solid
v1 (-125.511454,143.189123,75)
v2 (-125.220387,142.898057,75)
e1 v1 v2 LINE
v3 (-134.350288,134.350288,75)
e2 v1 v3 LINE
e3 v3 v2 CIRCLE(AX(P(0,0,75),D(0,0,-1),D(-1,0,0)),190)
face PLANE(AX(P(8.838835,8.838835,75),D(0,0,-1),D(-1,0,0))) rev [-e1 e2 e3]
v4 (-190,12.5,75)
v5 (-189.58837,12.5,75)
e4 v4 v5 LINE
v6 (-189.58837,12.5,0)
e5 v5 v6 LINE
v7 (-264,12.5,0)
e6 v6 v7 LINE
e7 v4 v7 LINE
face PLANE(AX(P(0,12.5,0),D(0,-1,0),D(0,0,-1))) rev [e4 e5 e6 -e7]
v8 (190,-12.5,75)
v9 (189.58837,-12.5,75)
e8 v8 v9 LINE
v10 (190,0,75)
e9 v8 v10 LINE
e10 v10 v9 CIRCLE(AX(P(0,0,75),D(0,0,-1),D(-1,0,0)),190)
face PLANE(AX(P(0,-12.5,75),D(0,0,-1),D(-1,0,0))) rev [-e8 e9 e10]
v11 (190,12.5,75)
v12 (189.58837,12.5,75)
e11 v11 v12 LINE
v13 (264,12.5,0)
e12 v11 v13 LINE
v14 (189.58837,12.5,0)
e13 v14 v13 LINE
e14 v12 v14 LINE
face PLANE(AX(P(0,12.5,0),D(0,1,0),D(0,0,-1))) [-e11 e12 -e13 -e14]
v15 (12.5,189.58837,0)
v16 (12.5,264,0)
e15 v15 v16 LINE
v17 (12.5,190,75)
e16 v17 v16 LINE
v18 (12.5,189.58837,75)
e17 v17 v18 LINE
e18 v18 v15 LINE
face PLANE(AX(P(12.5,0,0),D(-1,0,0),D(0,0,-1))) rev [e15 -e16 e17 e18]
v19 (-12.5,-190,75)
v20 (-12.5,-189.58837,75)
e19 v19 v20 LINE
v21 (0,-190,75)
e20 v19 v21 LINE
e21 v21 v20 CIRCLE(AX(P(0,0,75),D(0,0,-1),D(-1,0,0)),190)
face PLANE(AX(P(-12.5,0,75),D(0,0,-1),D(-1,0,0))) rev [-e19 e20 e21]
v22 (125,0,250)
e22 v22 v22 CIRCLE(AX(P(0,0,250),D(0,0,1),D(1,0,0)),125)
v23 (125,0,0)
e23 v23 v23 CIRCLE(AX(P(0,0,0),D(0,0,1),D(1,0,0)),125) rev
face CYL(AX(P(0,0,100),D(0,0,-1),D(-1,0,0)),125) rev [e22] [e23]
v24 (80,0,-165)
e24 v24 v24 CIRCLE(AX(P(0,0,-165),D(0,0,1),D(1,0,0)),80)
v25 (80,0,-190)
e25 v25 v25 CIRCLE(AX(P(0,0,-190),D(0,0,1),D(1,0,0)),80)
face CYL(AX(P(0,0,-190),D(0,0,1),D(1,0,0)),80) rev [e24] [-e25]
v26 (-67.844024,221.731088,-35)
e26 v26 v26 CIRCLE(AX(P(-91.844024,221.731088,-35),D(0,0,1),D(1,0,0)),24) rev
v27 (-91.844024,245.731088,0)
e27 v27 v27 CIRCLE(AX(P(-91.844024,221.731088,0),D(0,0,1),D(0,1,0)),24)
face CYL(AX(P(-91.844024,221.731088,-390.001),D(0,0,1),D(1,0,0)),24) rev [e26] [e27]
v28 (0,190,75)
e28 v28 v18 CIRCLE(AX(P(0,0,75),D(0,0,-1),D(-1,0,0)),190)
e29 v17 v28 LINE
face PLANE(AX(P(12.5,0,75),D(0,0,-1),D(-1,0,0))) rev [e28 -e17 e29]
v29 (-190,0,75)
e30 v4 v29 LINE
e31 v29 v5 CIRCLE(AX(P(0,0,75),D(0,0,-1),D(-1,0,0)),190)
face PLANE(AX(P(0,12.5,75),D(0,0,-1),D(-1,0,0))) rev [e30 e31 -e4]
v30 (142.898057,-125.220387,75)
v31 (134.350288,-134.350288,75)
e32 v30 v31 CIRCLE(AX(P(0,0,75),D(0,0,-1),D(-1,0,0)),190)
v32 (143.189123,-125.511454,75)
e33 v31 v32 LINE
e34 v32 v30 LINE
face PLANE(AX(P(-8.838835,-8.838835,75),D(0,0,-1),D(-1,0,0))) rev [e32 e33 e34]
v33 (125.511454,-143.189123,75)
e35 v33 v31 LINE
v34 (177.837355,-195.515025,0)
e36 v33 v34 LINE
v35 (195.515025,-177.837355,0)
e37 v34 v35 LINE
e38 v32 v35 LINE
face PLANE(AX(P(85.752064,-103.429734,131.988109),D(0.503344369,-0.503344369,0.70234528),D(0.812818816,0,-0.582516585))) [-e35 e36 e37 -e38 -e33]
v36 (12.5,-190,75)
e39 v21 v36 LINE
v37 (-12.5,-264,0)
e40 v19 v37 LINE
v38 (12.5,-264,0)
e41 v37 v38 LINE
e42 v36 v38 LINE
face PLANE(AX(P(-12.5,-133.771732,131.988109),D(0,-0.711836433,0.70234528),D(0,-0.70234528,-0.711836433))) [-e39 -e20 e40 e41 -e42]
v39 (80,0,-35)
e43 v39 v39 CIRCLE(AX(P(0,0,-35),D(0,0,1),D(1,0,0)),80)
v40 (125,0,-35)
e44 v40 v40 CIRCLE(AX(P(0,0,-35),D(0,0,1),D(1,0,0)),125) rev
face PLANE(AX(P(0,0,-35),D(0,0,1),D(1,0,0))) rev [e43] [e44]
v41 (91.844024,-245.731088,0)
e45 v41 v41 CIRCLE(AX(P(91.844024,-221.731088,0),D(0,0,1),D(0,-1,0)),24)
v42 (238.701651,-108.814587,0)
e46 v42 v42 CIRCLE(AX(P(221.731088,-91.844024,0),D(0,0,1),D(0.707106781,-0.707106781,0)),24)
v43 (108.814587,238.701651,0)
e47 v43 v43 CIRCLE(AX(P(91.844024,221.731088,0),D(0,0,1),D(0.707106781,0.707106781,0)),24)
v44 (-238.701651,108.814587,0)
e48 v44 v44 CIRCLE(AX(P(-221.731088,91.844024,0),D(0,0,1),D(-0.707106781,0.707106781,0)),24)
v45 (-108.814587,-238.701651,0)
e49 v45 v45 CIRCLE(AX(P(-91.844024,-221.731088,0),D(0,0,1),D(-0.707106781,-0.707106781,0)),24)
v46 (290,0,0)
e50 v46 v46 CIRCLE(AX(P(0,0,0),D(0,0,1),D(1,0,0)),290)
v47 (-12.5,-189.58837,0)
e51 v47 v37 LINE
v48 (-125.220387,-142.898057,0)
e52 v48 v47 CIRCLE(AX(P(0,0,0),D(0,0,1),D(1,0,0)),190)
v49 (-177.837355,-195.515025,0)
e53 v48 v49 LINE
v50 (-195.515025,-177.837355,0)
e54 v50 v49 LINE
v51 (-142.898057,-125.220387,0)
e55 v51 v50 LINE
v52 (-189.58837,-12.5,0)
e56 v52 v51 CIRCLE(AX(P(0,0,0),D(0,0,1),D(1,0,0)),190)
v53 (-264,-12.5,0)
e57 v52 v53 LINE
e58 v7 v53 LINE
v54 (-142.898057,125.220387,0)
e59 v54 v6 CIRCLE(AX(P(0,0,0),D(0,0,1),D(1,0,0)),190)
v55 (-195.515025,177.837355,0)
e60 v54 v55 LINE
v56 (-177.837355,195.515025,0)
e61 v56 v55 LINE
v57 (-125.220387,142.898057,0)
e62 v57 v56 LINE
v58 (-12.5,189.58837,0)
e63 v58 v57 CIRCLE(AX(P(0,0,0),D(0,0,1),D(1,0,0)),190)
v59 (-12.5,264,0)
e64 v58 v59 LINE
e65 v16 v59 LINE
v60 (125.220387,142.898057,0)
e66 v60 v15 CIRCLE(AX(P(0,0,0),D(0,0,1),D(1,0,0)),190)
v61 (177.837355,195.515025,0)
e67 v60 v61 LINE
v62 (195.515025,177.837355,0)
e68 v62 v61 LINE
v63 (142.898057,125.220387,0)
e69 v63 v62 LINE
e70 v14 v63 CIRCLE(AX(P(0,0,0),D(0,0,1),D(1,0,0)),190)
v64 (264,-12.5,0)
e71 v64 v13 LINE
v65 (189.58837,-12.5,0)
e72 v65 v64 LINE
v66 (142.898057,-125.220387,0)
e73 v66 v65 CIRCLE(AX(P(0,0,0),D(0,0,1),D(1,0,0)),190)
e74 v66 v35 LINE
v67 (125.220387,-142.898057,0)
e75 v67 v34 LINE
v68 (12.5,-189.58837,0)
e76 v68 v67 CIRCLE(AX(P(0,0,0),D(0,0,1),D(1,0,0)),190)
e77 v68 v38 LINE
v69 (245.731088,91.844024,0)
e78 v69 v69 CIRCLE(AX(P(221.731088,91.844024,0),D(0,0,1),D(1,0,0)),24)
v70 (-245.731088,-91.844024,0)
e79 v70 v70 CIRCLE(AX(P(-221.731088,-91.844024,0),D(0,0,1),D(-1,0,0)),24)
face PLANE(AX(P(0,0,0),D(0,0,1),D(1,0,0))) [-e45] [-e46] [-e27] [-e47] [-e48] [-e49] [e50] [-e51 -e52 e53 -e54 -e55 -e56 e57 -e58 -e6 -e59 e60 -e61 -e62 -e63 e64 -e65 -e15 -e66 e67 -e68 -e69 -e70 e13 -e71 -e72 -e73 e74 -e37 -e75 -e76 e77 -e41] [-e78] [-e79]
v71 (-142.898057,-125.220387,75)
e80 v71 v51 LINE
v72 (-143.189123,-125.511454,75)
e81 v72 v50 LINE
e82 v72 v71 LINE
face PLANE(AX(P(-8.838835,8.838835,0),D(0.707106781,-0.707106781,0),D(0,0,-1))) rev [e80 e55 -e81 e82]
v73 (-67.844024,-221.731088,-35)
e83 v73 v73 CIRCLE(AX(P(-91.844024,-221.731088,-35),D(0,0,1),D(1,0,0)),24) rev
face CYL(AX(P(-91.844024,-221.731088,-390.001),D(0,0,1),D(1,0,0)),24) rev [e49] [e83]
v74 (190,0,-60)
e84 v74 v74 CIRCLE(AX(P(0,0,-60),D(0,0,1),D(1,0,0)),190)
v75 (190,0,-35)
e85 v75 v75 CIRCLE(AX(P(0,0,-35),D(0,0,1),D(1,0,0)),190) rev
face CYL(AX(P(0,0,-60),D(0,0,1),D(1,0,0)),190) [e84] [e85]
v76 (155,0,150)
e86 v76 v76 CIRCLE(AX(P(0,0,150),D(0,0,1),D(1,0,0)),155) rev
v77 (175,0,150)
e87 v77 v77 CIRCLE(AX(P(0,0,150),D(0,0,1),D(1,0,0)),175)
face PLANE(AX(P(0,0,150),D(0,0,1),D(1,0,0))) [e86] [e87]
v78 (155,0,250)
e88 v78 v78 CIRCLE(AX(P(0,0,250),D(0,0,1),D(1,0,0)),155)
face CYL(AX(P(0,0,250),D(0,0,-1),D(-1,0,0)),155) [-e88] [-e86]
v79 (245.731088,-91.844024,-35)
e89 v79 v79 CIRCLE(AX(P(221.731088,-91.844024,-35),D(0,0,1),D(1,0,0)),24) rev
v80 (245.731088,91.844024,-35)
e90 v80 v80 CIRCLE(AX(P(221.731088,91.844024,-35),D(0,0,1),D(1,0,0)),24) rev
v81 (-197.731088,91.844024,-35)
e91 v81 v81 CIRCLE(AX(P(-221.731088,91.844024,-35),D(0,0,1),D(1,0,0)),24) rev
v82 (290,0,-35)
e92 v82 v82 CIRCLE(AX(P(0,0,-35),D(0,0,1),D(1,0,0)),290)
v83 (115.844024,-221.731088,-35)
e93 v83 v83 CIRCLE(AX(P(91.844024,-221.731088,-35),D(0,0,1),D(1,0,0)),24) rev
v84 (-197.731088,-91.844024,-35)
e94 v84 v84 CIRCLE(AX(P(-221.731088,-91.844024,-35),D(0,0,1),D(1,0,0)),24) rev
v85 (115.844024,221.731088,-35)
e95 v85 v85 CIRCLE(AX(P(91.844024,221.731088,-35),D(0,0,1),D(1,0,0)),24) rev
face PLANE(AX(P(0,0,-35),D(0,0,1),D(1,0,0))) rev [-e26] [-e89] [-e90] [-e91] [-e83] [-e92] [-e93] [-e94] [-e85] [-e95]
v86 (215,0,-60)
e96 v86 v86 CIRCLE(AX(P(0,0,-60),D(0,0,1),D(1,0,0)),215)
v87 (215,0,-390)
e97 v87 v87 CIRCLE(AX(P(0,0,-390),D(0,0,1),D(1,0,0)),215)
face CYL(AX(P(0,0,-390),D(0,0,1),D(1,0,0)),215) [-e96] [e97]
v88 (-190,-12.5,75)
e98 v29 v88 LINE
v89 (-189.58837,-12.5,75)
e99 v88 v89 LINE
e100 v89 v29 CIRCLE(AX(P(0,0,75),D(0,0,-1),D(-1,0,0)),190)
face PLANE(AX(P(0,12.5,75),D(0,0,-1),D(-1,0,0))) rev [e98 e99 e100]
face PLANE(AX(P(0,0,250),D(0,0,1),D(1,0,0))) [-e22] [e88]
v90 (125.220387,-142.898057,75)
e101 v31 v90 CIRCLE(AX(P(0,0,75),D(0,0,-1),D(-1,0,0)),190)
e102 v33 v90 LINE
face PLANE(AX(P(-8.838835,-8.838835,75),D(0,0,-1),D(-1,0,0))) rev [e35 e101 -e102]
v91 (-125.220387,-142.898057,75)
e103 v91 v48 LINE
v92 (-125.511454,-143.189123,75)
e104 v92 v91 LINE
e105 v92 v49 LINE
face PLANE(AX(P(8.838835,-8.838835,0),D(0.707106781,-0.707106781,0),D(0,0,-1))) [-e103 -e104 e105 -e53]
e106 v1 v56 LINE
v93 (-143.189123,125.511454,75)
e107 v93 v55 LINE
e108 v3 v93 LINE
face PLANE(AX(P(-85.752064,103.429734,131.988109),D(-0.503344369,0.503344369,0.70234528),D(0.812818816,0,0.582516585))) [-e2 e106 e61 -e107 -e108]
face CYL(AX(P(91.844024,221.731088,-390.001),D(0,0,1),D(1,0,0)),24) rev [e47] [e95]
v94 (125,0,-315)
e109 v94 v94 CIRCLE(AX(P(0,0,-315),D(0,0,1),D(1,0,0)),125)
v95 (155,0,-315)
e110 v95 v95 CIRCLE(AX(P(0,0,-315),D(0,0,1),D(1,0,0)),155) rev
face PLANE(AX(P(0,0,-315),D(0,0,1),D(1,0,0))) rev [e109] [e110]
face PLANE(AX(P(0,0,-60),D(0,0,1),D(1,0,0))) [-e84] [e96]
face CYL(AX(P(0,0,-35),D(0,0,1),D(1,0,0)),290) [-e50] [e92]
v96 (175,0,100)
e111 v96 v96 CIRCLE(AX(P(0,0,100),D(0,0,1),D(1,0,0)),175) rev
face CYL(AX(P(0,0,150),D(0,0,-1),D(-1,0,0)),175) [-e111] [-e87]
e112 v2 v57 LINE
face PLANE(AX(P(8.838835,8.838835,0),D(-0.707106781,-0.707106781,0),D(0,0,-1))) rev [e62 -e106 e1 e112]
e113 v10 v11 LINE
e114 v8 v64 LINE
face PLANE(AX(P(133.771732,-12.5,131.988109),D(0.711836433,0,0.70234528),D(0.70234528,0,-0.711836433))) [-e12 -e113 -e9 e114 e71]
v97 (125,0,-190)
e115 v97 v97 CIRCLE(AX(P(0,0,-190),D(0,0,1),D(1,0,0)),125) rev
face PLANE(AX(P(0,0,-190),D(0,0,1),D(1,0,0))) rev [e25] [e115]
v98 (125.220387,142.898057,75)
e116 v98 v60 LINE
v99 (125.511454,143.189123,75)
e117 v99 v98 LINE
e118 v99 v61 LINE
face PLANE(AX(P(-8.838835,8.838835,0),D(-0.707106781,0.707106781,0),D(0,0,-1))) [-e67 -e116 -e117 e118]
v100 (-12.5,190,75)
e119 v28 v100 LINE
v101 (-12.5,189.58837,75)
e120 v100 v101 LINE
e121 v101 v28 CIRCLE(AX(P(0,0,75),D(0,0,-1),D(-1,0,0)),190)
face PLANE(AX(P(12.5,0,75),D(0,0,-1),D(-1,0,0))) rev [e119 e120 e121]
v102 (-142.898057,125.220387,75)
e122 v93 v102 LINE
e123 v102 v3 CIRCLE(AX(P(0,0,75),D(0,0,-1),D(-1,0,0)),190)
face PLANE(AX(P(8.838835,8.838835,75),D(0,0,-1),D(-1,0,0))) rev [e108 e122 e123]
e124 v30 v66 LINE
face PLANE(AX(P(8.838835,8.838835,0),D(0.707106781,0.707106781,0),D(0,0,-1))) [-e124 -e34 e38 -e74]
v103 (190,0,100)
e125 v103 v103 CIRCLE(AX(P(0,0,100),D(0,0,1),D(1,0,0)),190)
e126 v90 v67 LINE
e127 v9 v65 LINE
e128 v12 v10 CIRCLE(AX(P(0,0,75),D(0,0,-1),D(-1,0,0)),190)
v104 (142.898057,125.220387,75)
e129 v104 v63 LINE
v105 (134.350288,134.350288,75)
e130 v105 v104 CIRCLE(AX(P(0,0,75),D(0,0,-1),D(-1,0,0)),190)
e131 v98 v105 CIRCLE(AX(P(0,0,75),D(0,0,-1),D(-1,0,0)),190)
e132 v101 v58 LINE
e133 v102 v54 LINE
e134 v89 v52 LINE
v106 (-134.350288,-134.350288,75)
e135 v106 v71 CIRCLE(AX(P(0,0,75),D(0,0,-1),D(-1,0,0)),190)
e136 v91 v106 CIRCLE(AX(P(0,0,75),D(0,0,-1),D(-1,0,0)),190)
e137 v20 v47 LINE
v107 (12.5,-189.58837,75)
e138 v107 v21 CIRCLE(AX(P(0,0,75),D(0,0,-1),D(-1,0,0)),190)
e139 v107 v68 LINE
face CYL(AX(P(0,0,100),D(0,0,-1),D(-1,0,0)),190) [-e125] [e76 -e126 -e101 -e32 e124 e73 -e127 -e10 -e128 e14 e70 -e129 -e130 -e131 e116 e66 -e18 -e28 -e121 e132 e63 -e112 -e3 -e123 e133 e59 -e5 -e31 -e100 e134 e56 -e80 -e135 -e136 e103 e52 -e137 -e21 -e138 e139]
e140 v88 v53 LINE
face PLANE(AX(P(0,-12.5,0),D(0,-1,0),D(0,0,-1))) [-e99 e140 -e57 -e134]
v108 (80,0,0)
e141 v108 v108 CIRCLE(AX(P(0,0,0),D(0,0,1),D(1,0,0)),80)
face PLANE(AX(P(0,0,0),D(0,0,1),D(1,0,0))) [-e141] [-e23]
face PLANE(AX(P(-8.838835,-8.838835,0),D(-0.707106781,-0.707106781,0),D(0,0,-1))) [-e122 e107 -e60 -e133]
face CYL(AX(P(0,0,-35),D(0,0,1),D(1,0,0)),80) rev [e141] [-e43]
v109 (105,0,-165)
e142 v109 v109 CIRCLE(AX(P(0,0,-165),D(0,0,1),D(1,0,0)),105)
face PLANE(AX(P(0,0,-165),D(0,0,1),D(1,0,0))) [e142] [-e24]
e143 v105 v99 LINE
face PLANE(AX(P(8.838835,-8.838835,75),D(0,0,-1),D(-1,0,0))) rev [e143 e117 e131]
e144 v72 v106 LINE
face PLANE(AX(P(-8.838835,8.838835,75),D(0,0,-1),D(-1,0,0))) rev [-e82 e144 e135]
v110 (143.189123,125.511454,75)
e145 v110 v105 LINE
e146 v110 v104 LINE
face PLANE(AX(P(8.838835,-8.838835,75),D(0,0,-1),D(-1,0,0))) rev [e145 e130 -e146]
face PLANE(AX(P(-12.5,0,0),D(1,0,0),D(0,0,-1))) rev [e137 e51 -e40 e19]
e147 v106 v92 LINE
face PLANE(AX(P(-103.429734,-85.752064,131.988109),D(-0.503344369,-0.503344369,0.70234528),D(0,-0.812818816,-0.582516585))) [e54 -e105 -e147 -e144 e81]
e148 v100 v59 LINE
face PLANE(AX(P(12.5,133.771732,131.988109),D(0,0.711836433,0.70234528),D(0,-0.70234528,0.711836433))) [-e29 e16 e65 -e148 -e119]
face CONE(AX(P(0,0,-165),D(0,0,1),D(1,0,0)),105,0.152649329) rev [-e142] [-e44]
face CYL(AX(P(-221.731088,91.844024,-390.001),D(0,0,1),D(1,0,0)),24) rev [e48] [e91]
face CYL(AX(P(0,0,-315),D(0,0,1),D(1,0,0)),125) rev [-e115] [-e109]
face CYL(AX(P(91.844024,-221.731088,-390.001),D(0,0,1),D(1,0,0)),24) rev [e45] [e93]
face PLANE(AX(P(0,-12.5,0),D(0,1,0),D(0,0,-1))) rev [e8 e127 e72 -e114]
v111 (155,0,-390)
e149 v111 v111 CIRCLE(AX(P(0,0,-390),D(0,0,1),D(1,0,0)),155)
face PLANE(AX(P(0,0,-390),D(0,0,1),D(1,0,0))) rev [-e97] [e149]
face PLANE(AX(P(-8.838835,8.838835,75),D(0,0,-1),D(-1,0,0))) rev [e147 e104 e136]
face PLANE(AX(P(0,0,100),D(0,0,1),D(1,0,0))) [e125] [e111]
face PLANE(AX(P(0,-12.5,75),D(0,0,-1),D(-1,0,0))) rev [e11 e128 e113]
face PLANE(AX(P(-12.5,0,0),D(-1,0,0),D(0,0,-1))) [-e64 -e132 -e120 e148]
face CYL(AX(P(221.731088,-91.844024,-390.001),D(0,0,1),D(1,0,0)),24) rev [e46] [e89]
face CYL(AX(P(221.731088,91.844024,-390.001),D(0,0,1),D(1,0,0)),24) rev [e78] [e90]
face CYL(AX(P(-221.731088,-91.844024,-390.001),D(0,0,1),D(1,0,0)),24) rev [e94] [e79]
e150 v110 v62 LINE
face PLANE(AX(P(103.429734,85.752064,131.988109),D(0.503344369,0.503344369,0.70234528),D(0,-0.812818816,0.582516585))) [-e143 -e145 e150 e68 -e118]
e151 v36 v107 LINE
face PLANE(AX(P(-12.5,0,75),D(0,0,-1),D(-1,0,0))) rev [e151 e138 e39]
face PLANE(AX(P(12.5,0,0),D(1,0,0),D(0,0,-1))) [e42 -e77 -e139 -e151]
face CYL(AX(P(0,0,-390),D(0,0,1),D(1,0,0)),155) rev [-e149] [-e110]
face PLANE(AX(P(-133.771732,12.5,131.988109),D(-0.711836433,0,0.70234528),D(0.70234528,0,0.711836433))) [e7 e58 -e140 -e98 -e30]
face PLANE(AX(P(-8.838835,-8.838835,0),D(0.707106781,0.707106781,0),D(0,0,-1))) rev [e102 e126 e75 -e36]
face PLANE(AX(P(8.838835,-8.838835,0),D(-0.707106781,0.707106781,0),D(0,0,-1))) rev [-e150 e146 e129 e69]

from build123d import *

# Parameters (mm, degrees)
SKETCH2_R            = 215
SKETCH2_R_2          = 155
BOSS_EXTRUDE1_DEPTH  = 390
SKETCH2_3_R          = 155
SKETCH2_3_R_2        = 125
BOSS_EXTRUDE2_DEPTH  = 315
SKETCH2_5_R          = 125
SKETCH2_5_R_2        = 80
BOSS_EXTRUDE4_DEPTH  = 190
SKETCH2_6_R          = 125
SKETCH2_6_R_2        = 80
CUT_EXTRUDE1_DEPTH   = 165
SKETCH2_7_R          = 125
SKETCH2_7_R_2        = 105
BOSS_EXTRUDE5_DEPTH  = 165
CUT_EXTRUDE2_START   = -165
SKETCH2_9_R          = 105
SKETCH2_9_R_2        = 80
CUT_EXTRUDE2_DEPTH   = 165
CUT_EXTRUDE2_DRAFT   = -8.7461623
SKETCH2_10_R         = 155
SKETCH2_10_R_2       = 125
BOSS_EXTRUDE6_DEPTH  = 165
SKETCH2_12_R         = 215
SKETCH2_12_R_2       = 190
CUT_EXTRUDE3_DEPTH   = 60
SKETCH2_13_R         = 290
SKETCH2_13_R_2       = 80
BOSS_EXTRUDE7_DEPTH  = 35
BOSS_EXTRUDE8_START  = 100
SKETCH3_R            = 190
SKETCH3_R_2          = 125
BOSS_EXTRUDE8_DEPTH  = 100
BOSS_EXTRUDE10_START = 150
SKETCH3_5_R          = 175
SKETCH3_5_R_2        = 125
BOSS_EXTRUDE10_DEPTH = 150
BOSS_EXTRUDE11_START = 250
SKETCH3_6_R          = 155
SKETCH3_6_R_2        = 125
BOSS_EXTRUDE11_DEPTH = 250
CUT_EXTRUDE5_REACH   = 567.951
SKETCH4_R            = 24
CIRPATTERN2_COUNT    = 8
BOSS_EXTRUDE12_DEPTH = 12.5
CIRPATTERN3_COUNT    = 8


with BuildPart() as part:
    # Sketch2 → Boss-Extrude1 (new body)
    with BuildSketch(Plane(origin=(0, 0, 0), x_dir=(0, 1, 0), z_dir=(0, 0, 1))):
        Circle(SKETCH2_R)
        Circle(SKETCH2_R_2, mode=Mode.SUBTRACT)
    extrude(amount=-BOSS_EXTRUDE1_DEPTH)

    # Sketch2<3> → Boss-Extrude2 (add)
    with BuildSketch(Plane(origin=(0, 0, 0), x_dir=(0, 1, 0), z_dir=(0, 0, 1))):
        Circle(SKETCH2_3_R)
        Circle(SKETCH2_3_R_2, mode=Mode.SUBTRACT)
    extrude(amount=-BOSS_EXTRUDE2_DEPTH)

    # Sketch2<5> → Boss-Extrude4 (add)
    with BuildSketch(Plane(origin=(0, 0, 0), x_dir=(0, 1, 0), z_dir=(0, 0, 1))):
        Circle(SKETCH2_5_R)
        Circle(SKETCH2_5_R_2, mode=Mode.SUBTRACT)
    extrude(amount=-BOSS_EXTRUDE4_DEPTH)

    # Sketch2<6> → Cut-Extrude1 (cut)
    with BuildSketch(Plane(origin=(0, 0, 0), x_dir=(0, 1, 0), z_dir=(0, 0, 1))):
        Circle(SKETCH2_6_R)
        Circle(SKETCH2_6_R_2, mode=Mode.SUBTRACT)
    extrude(amount=-CUT_EXTRUDE1_DEPTH, mode=Mode.SUBTRACT)

    # Sketch2<7> → Boss-Extrude5 (add)
    with BuildSketch(Plane(origin=(0, 0, 0), x_dir=(0, 1, 0), z_dir=(0, 0, 1))):
        Circle(SKETCH2_7_R)
        Circle(SKETCH2_7_R_2, mode=Mode.SUBTRACT)
    extrude(amount=-BOSS_EXTRUDE5_DEPTH)


with BuildPart() as cut_extrude2_tool:
    # Sketch2<9> → Cut-Extrude2 (with draft: the straight prism first)
    with BuildSketch(Plane(origin=(0, 0, 0), x_dir=(0, 1, 0), z_dir=(0, 0, 1)).offset(CUT_EXTRUDE2_START)):
        Circle(SKETCH2_9_R)
        Circle(SKETCH2_9_R_2, mode=Mode.SUBTRACT)
    extrude(amount=CUT_EXTRUDE2_DEPTH)
    # Cut-Extrude2: the draft: its side faces are tilted about the plane it starts from
    cut_extrude2_sides = [cut_extrude2_tool.faces().sort_by_distance(p)[0] for p in [
        (0, -105, -82.5),
        (0, -80, -82.5),
    ]]
    draft(cut_extrude2_sides, Plane(origin=(0, 0, 0), x_dir=(0, 1, 0), z_dir=(0, 0, 1)).offset(CUT_EXTRUDE2_START), CUT_EXTRUDE2_DRAFT)


with BuildPart() as part_1:
    add(part.part)

    # Cut-Extrude2: cut by cut_extrude2_tool
    add(cut_extrude2_tool.part, mode=Mode.SUBTRACT)

    # Sketch2<10> → Boss-Extrude6 (add)
    with BuildSketch(Plane(origin=(0, 0, 0), x_dir=(0, 1, 0), z_dir=(0, 0, 1))):
        Circle(SKETCH2_10_R)
        Circle(SKETCH2_10_R_2, mode=Mode.SUBTRACT)
    extrude(amount=-BOSS_EXTRUDE6_DEPTH)

    # Sketch2<12> → Cut-Extrude3 (cut)
    with BuildSketch(Plane(origin=(0, 0, 0), x_dir=(0, 1, 0), z_dir=(0, 0, 1))):
        Circle(SKETCH2_12_R)
        Circle(SKETCH2_12_R_2, mode=Mode.SUBTRACT)
    extrude(amount=-CUT_EXTRUDE3_DEPTH, mode=Mode.SUBTRACT)


with BuildPart() as boss_extrude7_tool:
    # Sketch2<13> → Boss-Extrude7 (new body)
    with BuildSketch(Plane(origin=(0, 0, 0), x_dir=(0, 1, 0), z_dir=(0, 0, 1))):
        Circle(SKETCH2_13_R)
        Circle(SKETCH2_13_R_2, mode=Mode.SUBTRACT)
    extrude(amount=-BOSS_EXTRUDE7_DEPTH)


with BuildPart() as part_2:
    add(part_1.part)


with BuildPart() as part_3:
    # Boss-Extrude7: joined with boss_extrude7_tool
    add(part_2.part.fuse(boss_extrude7_tool.part, tol=0.00001))

    # Sketch3 → Boss-Extrude8 (add)
    with BuildSketch(Plane.XY.offset(BOSS_EXTRUDE8_START)):
        Circle(SKETCH3_R)
        Circle(SKETCH3_R_2, mode=Mode.SUBTRACT)
    extrude(amount=-BOSS_EXTRUDE8_DEPTH)

    # Sketch3<5> → Boss-Extrude10 (add)
    with BuildSketch(Plane.XY.offset(BOSS_EXTRUDE10_START)):
        Circle(SKETCH3_5_R)
        Circle(SKETCH3_5_R_2, mode=Mode.SUBTRACT)
    extrude(amount=-BOSS_EXTRUDE10_DEPTH)

    # Sketch3<6> → Boss-Extrude11 (add)
    with BuildSketch(Plane.XY.offset(BOSS_EXTRUDE11_START)):
        Circle(SKETCH3_6_R)
        Circle(SKETCH3_6_R_2, mode=Mode.SUBTRACT)
    extrude(amount=-BOSS_EXTRUDE11_DEPTH)

    # Sketch4 → Cut-Extrude5 (cut, up to next)
    with BuildSketch(Plane.XY, mode=Mode.PRIVATE) as cut_extrude5_sk1:
        with Locations((221.731087803, 91.844023768)):
            Circle(SKETCH4_R)
    cut_extrude5_tool1 = extrude(cut_extrude5_sk1.sketch, amount=-CUT_EXTRUDE5_REACH, mode=Mode.PRIVATE) & part_3.part
    cut_extrude5 = cut_extrude5_tool1.solids().sort_by_distance((221.731088, 91.844024, 0))[0]
    add(cut_extrude5, mode=Mode.SUBTRACT)

    # CirPattern2: Cut-Extrude5 ×8 about axis
    cirpattern2_axis = Axis((0, 0, 0), (0, 0, 1))
    for i in range(1, CIRPATTERN2_COUNT):
        add(cut_extrude5.rotate(cirpattern2_axis, i * 360 / CIRPATTERN2_COUNT), mode=Mode.SUBTRACT)

    # Sketch6 → Boss-Extrude12 (add, symmetric)
    with BuildSketch(Plane.YZ):
        Polygon((-264, 0), (-168, 0), (-168, 75), (-190, 75), align=None)
    boss_extrude12 = extrude(amount=BOSS_EXTRUDE12_DEPTH, both=True)

    # CirPattern3: Boss-Extrude12 ×8 about axis
    cirpattern3_axis = Axis((0, 0, 0), (0, 0, 1))
    for i in range(1, CIRPATTERN3_COUNT):
        add(boss_extrude12.rotate(cirpattern3_axis, i * 360 / CIRPATTERN3_COUNT))


solid = part_3.part
